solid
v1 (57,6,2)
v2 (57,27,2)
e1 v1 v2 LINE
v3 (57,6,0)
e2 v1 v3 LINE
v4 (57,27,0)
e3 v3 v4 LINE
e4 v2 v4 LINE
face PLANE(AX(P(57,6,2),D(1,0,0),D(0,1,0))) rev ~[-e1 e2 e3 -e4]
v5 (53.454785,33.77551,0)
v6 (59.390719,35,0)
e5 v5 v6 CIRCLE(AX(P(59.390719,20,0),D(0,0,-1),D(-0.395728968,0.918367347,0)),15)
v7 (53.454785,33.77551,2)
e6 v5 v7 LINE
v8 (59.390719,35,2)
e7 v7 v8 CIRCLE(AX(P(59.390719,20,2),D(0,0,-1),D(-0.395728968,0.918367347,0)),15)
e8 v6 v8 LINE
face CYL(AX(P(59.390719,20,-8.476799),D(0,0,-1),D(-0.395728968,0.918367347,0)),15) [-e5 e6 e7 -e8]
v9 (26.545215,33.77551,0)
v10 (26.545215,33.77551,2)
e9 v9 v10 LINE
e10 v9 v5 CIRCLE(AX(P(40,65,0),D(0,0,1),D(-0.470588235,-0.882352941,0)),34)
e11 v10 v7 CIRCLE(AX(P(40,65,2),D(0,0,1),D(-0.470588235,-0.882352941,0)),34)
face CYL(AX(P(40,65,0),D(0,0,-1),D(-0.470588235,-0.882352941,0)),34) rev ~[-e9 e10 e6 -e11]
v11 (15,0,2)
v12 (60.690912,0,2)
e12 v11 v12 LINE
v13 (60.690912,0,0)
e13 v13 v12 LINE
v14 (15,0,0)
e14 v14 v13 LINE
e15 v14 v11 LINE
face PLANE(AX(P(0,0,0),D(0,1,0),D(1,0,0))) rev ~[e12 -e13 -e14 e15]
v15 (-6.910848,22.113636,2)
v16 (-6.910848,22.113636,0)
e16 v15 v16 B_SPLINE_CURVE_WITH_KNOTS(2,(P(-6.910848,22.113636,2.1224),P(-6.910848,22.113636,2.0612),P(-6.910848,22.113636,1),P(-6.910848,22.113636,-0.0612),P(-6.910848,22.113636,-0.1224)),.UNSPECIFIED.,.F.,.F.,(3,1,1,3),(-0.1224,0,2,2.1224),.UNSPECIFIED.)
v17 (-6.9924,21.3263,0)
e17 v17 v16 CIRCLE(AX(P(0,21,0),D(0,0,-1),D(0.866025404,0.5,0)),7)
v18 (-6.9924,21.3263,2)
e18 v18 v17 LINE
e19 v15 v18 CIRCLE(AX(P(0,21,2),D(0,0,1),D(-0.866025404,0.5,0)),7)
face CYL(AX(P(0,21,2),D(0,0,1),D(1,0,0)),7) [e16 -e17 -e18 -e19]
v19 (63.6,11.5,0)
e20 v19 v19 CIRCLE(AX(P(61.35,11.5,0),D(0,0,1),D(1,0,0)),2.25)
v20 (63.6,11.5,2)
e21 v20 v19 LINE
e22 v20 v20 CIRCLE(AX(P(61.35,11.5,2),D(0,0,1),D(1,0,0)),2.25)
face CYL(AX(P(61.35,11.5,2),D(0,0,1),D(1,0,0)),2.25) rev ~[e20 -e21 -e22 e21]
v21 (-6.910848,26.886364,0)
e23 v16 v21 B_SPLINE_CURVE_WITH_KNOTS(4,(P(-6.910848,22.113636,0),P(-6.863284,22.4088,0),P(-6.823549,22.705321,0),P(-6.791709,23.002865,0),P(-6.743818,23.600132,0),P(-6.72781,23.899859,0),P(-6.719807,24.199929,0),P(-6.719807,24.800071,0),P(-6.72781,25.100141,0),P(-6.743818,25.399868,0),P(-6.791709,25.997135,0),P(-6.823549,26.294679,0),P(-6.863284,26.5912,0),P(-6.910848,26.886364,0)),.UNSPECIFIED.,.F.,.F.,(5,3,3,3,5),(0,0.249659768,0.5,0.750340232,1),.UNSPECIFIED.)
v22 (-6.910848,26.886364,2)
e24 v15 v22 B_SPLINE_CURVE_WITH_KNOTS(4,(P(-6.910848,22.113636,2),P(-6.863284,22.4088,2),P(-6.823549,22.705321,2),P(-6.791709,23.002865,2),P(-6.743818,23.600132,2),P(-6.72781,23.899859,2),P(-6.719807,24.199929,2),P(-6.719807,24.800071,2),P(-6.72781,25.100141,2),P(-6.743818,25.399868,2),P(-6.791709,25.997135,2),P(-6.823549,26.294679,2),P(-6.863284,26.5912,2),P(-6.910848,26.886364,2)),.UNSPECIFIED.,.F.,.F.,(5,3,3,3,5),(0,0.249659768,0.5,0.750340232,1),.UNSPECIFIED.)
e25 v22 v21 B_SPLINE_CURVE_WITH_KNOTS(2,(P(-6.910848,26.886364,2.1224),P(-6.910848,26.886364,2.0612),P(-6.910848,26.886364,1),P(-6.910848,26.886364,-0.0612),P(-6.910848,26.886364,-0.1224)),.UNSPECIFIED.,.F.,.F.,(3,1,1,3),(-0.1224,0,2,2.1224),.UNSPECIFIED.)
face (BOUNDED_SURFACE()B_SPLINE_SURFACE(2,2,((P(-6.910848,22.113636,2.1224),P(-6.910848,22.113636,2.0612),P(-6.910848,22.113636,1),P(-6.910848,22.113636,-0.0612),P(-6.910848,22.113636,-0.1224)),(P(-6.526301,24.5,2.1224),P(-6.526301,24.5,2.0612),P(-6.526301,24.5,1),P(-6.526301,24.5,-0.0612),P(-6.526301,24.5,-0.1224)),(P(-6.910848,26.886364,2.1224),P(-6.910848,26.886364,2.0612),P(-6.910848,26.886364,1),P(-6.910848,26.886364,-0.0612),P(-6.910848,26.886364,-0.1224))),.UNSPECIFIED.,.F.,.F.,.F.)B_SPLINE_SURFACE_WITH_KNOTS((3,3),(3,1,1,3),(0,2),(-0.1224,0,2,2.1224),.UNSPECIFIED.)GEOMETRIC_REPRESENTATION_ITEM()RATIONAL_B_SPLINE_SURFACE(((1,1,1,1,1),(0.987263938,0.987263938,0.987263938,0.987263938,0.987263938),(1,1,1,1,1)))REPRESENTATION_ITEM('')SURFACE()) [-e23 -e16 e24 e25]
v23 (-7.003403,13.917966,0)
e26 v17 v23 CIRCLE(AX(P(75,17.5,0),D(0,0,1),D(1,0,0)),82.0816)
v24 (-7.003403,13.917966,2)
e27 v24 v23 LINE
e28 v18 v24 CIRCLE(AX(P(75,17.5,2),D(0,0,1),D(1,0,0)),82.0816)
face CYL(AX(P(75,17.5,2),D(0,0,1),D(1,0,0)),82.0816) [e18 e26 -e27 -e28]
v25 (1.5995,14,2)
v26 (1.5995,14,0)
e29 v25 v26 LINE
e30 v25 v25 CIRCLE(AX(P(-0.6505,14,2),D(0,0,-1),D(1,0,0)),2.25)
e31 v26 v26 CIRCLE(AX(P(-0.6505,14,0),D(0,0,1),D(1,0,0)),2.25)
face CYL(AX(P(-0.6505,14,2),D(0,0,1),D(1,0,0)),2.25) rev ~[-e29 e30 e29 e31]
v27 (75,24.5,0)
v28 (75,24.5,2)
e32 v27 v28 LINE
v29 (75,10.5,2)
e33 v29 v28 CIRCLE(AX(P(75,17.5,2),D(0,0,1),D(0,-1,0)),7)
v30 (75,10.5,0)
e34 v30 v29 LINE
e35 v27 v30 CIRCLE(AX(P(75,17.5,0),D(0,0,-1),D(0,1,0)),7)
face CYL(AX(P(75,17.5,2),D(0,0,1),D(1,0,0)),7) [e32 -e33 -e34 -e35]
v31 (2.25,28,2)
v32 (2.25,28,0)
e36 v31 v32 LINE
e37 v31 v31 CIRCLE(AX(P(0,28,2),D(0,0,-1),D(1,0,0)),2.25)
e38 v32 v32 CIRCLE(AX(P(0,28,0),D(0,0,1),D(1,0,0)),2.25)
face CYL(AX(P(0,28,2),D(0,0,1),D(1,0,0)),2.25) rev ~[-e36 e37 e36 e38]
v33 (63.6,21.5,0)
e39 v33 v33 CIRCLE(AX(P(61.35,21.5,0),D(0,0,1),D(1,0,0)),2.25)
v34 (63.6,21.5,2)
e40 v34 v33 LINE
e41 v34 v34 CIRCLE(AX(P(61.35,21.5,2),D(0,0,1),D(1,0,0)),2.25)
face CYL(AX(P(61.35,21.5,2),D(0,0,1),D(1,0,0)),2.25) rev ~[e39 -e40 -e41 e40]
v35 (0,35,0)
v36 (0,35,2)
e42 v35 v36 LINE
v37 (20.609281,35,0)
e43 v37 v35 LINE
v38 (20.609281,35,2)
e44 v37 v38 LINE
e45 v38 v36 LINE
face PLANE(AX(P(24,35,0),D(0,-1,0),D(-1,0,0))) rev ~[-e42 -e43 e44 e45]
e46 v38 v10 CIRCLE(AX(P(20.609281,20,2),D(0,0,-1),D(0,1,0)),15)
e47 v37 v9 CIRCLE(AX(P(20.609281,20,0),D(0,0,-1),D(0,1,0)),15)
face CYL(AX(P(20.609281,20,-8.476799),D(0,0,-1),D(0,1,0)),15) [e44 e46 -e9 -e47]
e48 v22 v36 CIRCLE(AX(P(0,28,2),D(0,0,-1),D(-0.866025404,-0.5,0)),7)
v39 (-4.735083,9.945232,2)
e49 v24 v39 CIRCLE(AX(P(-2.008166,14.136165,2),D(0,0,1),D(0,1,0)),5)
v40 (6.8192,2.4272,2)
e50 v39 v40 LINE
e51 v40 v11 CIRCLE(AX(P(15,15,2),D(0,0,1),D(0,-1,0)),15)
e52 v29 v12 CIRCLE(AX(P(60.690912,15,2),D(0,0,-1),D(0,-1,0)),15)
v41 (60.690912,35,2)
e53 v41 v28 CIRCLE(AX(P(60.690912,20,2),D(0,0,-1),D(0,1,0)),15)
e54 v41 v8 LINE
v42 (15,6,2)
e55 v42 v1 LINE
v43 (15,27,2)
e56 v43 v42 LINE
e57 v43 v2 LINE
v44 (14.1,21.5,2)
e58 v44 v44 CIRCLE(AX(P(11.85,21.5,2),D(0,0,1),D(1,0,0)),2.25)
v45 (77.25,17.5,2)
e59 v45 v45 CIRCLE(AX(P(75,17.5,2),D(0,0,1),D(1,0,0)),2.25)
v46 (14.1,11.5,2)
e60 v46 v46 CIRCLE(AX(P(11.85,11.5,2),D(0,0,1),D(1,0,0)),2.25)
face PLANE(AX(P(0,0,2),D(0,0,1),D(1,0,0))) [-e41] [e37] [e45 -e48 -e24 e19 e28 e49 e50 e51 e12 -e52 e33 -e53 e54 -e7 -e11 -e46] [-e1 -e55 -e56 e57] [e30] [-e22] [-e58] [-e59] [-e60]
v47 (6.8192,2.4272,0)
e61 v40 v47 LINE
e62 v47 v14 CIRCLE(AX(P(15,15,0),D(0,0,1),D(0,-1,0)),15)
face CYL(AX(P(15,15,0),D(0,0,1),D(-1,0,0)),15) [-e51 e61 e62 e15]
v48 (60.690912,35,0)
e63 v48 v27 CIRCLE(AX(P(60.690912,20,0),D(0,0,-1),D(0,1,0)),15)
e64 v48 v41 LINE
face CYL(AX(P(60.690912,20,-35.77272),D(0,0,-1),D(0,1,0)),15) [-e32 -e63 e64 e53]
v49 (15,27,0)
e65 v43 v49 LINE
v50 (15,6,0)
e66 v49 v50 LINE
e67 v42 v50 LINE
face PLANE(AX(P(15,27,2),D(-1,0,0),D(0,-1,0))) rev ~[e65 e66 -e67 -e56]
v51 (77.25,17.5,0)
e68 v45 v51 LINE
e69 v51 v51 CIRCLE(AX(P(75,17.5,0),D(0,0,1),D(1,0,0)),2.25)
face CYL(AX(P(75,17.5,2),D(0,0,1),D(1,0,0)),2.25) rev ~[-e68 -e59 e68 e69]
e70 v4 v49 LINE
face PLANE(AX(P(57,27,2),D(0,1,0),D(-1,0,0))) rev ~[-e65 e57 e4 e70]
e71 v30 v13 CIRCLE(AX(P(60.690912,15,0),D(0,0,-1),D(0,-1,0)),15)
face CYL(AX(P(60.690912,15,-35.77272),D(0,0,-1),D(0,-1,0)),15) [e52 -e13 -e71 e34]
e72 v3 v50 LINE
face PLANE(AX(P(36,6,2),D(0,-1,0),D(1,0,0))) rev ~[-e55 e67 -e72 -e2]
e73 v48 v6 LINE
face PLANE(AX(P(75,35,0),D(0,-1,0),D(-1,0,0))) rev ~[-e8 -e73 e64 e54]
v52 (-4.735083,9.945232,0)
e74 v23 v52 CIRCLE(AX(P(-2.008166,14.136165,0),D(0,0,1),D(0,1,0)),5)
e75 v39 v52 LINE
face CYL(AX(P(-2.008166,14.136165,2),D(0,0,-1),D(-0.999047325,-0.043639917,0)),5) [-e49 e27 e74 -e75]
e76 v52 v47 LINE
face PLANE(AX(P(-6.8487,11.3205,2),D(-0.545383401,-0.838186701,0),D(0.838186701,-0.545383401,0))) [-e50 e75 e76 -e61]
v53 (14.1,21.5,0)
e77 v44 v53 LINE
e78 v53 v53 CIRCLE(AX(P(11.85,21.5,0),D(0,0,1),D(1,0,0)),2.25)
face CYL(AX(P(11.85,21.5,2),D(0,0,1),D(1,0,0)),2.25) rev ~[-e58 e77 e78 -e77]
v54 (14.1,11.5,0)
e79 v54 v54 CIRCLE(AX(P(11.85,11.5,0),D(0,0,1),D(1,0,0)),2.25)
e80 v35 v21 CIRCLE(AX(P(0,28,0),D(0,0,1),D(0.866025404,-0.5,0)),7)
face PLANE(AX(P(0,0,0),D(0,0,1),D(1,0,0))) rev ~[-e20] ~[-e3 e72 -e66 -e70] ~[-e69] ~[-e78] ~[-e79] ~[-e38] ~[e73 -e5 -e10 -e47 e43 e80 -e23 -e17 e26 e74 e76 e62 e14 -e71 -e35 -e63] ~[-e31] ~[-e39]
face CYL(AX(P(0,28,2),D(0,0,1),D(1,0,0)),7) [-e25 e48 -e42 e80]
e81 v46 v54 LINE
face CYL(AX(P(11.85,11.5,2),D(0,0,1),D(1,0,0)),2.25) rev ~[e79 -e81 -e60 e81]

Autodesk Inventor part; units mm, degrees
ref_plane "YZ Plane" through (0, 0, 0) normal (1, 0, 0) x (0, 1, 0)
ref_plane "XZ Plane" through (0, 0, 0) normal (0, 1, 0) x (-1, 0, 0)
ref_plane "XY Plane" through (0, 0, 0) normal (0, 0, 1) x (1, 0, 0)
sketch "Skizze1" plane through (0, 0, 0) normal (0, 0, 1) x (1, 0, 0)
  line L0 (0, 78) -> (0, -13) projected
  line L1 (-15, 0) -> (90, 0) projected
  line L2 (0, 0) -> (75, 0)
  line L3 (75, 0) -> (75, 35)
  line L4 (75, 35) -> (0, 35)
  line L5 (0, 35) -> (0, 0)
  arc A0 (24, 35) -> (56, 35) centre (40, 65) ccw
  dimension "d0" = 75
  dimension "d1" = 35
  dimension "d3" = 35
  dimension "d4" = 30
  dimension "d6" = 34
extrude "Extrusion1" add sketch "Skizze1" along normal blind 2 contours L4 A0 L3 L1 L0
sketch "Skizze2" plane through (0, 0, 2) normal (0, 0, 1) x (1, 0, 0)
  line L0 (36, 6) -> (57, 6)
  line L1 (57, 6) -> (57, 27)
  line L2 (57, 27) -> (36, 27)
  line L3 (36, 27) -> (36, 6)
  line L4 (36, 6) -> (57, 27) construction
  line L5 (57, 6) -> (36, 27) construction
  line L6 (57, 27) -> (15, 27)
  line L7 (15, 27) -> (15, 6)
  line L8 (15, 6) -> (57, 6)
  line L9 (57, 6) -> (57, 27)
  line L10 (75, 0) -> (75, 35) projected
  line L11 (24, 35) -> (0, 35) projected
  circle A0 centre (61.35, 21.5) radius 2.25
  circle A1 centre (61.35, 11.5) radius 2.25
  circle A2 centre (11.85, 11.5) radius 2.25
  circle A3 centre (11.85, 21.5) radius 2.25
  point P0 (0, 0)
  point P1 (46.5, 16.5)
  dimension "d9" = 21
  dimension "d10" = 21
  dimension "d11" = 42
  dimension "d12" = 0
  dimension "d13" = 18
  dimension "d14" = 8
  dimension "d15" = 4.5
  dimension "d16" = 4.5
  dimension "d17" = 4.5
  dimension "d18" = 4.5
  dimension "d19" = 14.85
  dimension "d20" = 5
  dimension "d21" = 5
  dimension "d22" = 14.85
  dimension "d23" = 34.65
  dimension "d24" = 34.65
  dimension "d27" = 5
  dimension "d28" = 5
extrude "Extrusion2" cut sketch "Skizze2" against normal blind 2
sketch "Skizze3" plane through (0, 0, 2) normal (0, 0, 1) x (1, 0, 0)
  circle A0 centre (11.85, 21.5) radius 2.25 projected
  circle A1 centre (61.35, 11.5) radius 2.25 projected
  circle A2 centre (61.35, 21.5) radius 2.25 projected
  circle A3 centre (11.85, 11.5) radius 2.25 projected
  line L0 (15, 27) -> (15, 6) projected
  line L1 (15, 6) -> (57, 6) projected
  line L2 (57, 6) -> (57, 27) projected
  line L3 (57, 27) -> (15, 27) projected
  line L4 (0, 0) -> (0, 35) projected
  line L5 (0, 35) -> (24, 35) projected
  arc A4 (24, 35) -> (56, 35) centre (40, 65) ccw projected
  line L6 (56, 35) -> (75, 35) projected
  line L7 (75, 35) -> (75, 0) projected
  line L8 (75, 0) -> (0, 0) projected
  line L9 (75, 0) -> (75, 35) projected
  circle A5 centre (75, 17.5) radius 7
  line L10 (75, 0) -> (75, 35) projected
  dimension "d31" = 14
  dimension "d32" = 35
  dimension "d33" = 17.5
extrude "Extrusion3" add sketch "Skizze3" against normal blind 2 contours A5 L7 | L7 A5
sketch "Skizze4" plane through (0, 0, 2) normal (0, 0, 1) x (1, 0, 0)
  circle A0 centre (11.85, 21.5) radius 2.25 projected
  circle A1 centre (61.35, 11.5) radius 2.25 projected
  circle A2 centre (61.35, 21.5) radius 2.25 projected
  circle A3 centre (11.85, 11.5) radius 2.25 projected
  line L0 (15, 27) -> (15, 6) projected
  line L1 (15, 6) -> (57, 6) projected
  line L2 (57, 6) -> (57, 27) projected
  line L3 (57, 27) -> (15, 27) projected
  line L4 (0, 0) -> (0, 35) projected
  line L5 (0, 35) -> (24, 35) projected
  arc A4 (24, 35) -> (56, 35) centre (40, 65) ccw projected
  line L6 (56, 35) -> (75, 35) projected
  line L7 (75, 35) -> (75, 24.5) projected
  arc A5 (75, 10.5) -> (75, 24.5) centre (75, 17.5) ccw projected
  line L8 (75, 10.5) -> (75, 0) projected
  line L9 (75, 0) -> (0, 0) projected
  circle A6 centre (75, 17.5) radius 2.25
  dimension "d36" = 4.5
extrude "Extrusion4" cut sketch "Skizze4" against normal blind 2 contours A6
fillet "Rundung1" radius 15 1 edges at (0, 0, 1)
sketch "Skizze5" plane through (0, 0, 2) normal (0, 0, 1) x (1, 0, 0)
  line L0 (0, 35) -> (0, 15) projected
  circle A0 centre (0, 28) radius 7
  circle A1 centre (75, 17.5) radius 2.25 projected
  arc A2 (75, 10.5) -> (75, 24.5) centre (75, 17.5) ccw projected
  line L1 (75, 10.5) -> (75, 0) projected
  line L2 (75, 0) -> (15, 0) projected
  arc A3 (0, 15) -> (15, 0) centre (15, 15) ccw projected
  line L3 (0, 15) -> (0, 35) projected
  line L4 (0, 35) -> (24, 35) projected
  arc A4 (24, 35) -> (56, 35) centre (40, 65) ccw projected
  line L5 (56, 35) -> (75, 35) projected
  line L6 (75, 35) -> (75, 24.5) projected
  circle A5 centre (11.85, 21.5) radius 2.25 projected
  circle A6 centre (61.35, 11.5) radius 2.25 projected
  circle A7 centre (61.35, 21.5) radius 2.25 projected
  circle A8 centre (11.85, 11.5) radius 2.25 projected
  line L7 (15, 27) -> (15, 6) projected
  line L8 (15, 6) -> (57, 6) projected
  line L9 (57, 6) -> (57, 27) projected
  line L10 (57, 27) -> (15, 27) projected
  circle A9 centre (0, 21) radius 7
  point P0 (0, 0)
  dimension "d40" = 14
  dimension "d46" = 14
extrude "Extrusion5" add sketch "Skizze5" against normal blind 2 contours A0 A9 L0 | L0 A9 A0 | A9 A0 L0 | L0 A0 A9 | A0 L0 A3 A9 | A0 A9 A3 L0
sketch "Skizze6" plane through (0, 0, 2) normal (0, 0, 1) x (1, 0, 0)
  circle A0 centre (75, 17.5) radius 2.25 projected
  arc A1 (75, 10.5) -> (75, 24.5) centre (75, 17.5) ccw projected
  line L0 (75, 10.5) -> (75, 0) projected
  line L1 (75, 0) -> (15, 0) projected
  line L2 (0, 35) -> (24, 35) projected
  arc A2 (24, 35) -> (56, 35) centre (40, 65) ccw projected
  line L3 (56, 35) -> (75, 35) projected
  line L4 (75, 35) -> (75, 24.5) projected
  circle A3 centre (11.85, 21.5) radius 2.25 projected
  circle A4 centre (61.35, 11.5) radius 2.25 projected
  circle A5 centre (61.35, 21.5) radius 2.25 projected
  circle A6 centre (11.85, 11.5) radius 2.25 projected
  line L5 (15, 27) -> (15, 6) projected
  line L6 (15, 6) -> (57, 6) projected
  line L7 (57, 6) -> (57, 27) projected
  line L8 (57, 27) -> (15, 27) projected
  circle A7 centre (0, 28) radius 2.25
  circle A8 centre (75, 17.5) radius 75.7314
  circle A9 centre (-0.7298, 18) radius 7
  arc A10 (0.0334, 14.0001) -> (15, 0) centre (15, 15) ccw projected
  arc A11 (-6.0622, 24.5) -> (0.0334, 14.0001) centre (0, 21) ccw projected
  arc A12 (0, 35) -> (-6.0622, 24.5) centre (0, 28) ccw projected
  point P0 (0, 0)
  point P1 (0, 21)
  dimension "d43" = 4.5
  dimension "d47" = 14
  dimension "d48" = 3
extrude "Extrusion6" cut sketch "Skizze6" against normal blind 2 contours A8 A7 | A7 A8
fillet "Rundung2" radius 15 2 edges at (-6.0622, 24.5, 1) (0.0334, 14.0001, 1)
sketch "Skizze7" plane through (0, 0, 2) normal (0, 0, 1) x (1, 0, 0)
  circle A0 centre (0, 28) radius 2.25 projected
  circle A1 centre (75, 17.5) radius 2.25 projected
  arc A2 (75, 10.5) -> (75, 24.5) centre (75, 17.5) ccw projected
  line L0 (75, 10.5) -> (75, 0) projected
  line L1 (75, 0) -> (15, 0) projected
  arc A3 (1.286, 8.9233) -> (15, 0) centre (15, 15) ccw projected
  arc A4 (1.286, 8.9233) -> (-3.9544, 15.2239) centre (-12.428, 2.8466) ccw projected
  arc A5 (-6.9108, 22.1136) -> (-3.9544, 15.2239) centre (0, 21) ccw projected
  arc A6 (-6.9108, 22.1136) -> (-6.9108, 26.8864) centre (-21.7198, 24.5) ccw projected
  arc A7 (0, 35) -> (-6.9108, 26.8864) centre (0, 28) ccw projected
  line L2 (0, 35) -> (24, 35) projected
  arc A8 (24, 35) -> (56, 35) centre (40, 65) ccw projected
  line L3 (56, 35) -> (75, 35) projected
  line L4 (75, 35) -> (75, 24.5) projected
  circle A9 centre (11.85, 21.5) radius 2.25 projected
  circle A10 centre (61.35, 11.5) radius 2.25 projected
  circle A11 centre (61.35, 21.5) radius 2.25 projected
  circle A12 centre (11.85, 11.5) radius 2.25 projected
  line L5 (15, 27) -> (15, 6) projected
  line L6 (15, 6) -> (57, 6) projected
  line L7 (57, 6) -> (57, 27) projected
  line L8 (57, 27) -> (15, 27) projected
  arc A13 (75, 10.5) -> (75, 24.5) centre (75, 17.5) ccw projected
  circle A14 centre (75, 17.5) radius 75.7314
  circle A15 centre (-0.7166, 19) radius 2.25
  point P0 (0, 0)
  dimension "d50" = 9
  dimension "d51" = 4.5
extrude "Extrusion7" cut sketch "Skizze7" against normal blind 2 contours A15 A14 | A14 A15
fillet "Rundung3" radius 15 4 edges at (75, 35, 1) (56, 35, 1) (24, 35, 1) (75, 0, 1)
sketch "Skizze8" plane through (0, 0, 2) normal (0, 0, 1) x (1, 0, 0)
  circle A0 centre (-0.7166, 19) radius 2.25 projected
  arc A1 (1.286, 8.9233) -> (-3.9544, 15.2239) centre (-12.428, 2.8466) ccw projected
  arc A2 (-6.9108, 22.1136) -> (-3.9544, 15.2239) centre (0, 21) ccw projected
  arc A3 (-6.9108, 22.1136) -> (-6.9108, 26.8864) centre (-21.7198, 24.5) ccw projected
  arc A4 (0, 35) -> (-6.9108, 26.8864) centre (0, 28) ccw projected
  line L0 (0, 35) -> (20.6093, 35) projected
  arc A5 (26.5452, 33.7755) -> (20.6093, 35) centre (20.6093, 20) ccw projected
  arc A6 (26.5452, 33.7755) -> (53.4548, 33.7755) centre (40, 65) ccw projected
  arc A7 (59.3907, 35) -> (53.4548, 33.7755) centre (59.3907, 20) ccw projected
  line L1 (59.3907, 35) -> (60.6909, 35) projected
  arc A8 (75, 24.5) -> (60.6909, 35) centre (60.6909, 20) ccw projected
  arc A9 (75, 10.5) -> (75, 24.5) centre (75, 17.5) ccw projected
  arc A10 (60.6909, 0) -> (75, 10.5) centre (60.6909, 15) ccw projected
  line L2 (60.6909, 0) -> (15, 0) projected
  arc A11 (1.286, 8.9233) -> (15, 0) centre (15, 15) ccw projected
  circle A12 centre (0, 28) radius 2.25 projected
  circle A13 centre (75, 17.5) radius 2.25 projected
  circle A14 centre (11.85, 21.5) radius 2.25 projected
  circle A15 centre (61.35, 11.5) radius 2.25 projected
  circle A16 centre (61.35, 21.5) radius 2.25 projected
  circle A17 centre (11.85, 11.5) radius 2.25 projected
  line L3 (15, 27) -> (15, 6) projected
  line L4 (15, 6) -> (57, 6) projected
  line L5 (57, 6) -> (57, 27) projected
  line L6 (57, 27) -> (15, 27) projected
  circle A18 centre (75, 17.5) radius 2.25 projected
  circle A19 centre (75, 17.5) radius 82.0816
  line L7 (-6.8487, 11.3205) -> (6.8192, 2.4272)
  arc A20 (1.286, 8.9233) -> (15, 0) centre (15, 15) ccw projected
  line L8 (6.8192, 2.4272) -> (-0.8956, 15)
  line L9 (-0.8956, 15) -> (-5.8598, 18.2396)
  line L10 (-5.8598, 18.2396) -> (-6.9924, 21.3263)
  arc A21 (-6.9108, 22.1136) -> (-3.9544, 15.2239) centre (0, 21) ccw projected
  point P0 (0, 0)
extrude "Extrusion8" add sketch "Skizze8" against normal blind 2 contours A11 L7 A19 A2 A1 | A1 A2 L10 L9 L8 A11
fillet "Rundung4" radius 5 1 edges at (-6.8487, 11.3205, 1)
sketch "Skizze9" plane through (0, 0, 2) normal (0, 0, 1) x (1, 0, 0)
  arc A0 (26.5452, 33.7755) -> (20.6093, 35) centre (20.6093, 20) ccw projected
  arc A1 (26.5452, 33.7755) -> (53.4548, 33.7755) centre (40, 65) ccw projected
  arc A2 (59.3907, 35) -> (53.4548, 33.7755) centre (59.3907, 20) ccw projected
  line L0 (59.3907, 35) -> (60.6909, 35) projected
  arc A3 (75, 24.5) -> (60.6909, 35) centre (60.6909, 20) ccw projected
  arc A4 (75, 10.5) -> (75, 24.5) centre (75, 17.5) ccw projected
  arc A5 (60.6909, 0) -> (75, 10.5) centre (60.6909, 15) ccw projected
  line L1 (60.6909, 0) -> (15, 0) projected
  arc A6 (6.8192, 2.4272) -> (15, 0) centre (15, 15) ccw projected
  line L2 (6.8192, 2.4272) -> (-4.7351, 9.9453) projected
  arc A7 (-7.0034, 13.918) -> (-4.7351, 9.9453) centre (-2.0082, 14.1362) ccw projected
  arc A8 (-6.9924, 21.3263) -> (-7.0034, 13.918) centre (75, 17.5) ccw projected
  arc A9 (-6.9108, 22.1136) -> (-6.9924, 21.3263) centre (0, 21) ccw projected
  arc A10 (-6.9108, 22.1136) -> (-6.9108, 26.8864) centre (-21.7198, 24.5) ccw projected
  arc A11 (0, 35) -> (-6.9108, 26.8864) centre (0, 28) ccw projected
  line L3 (0, 35) -> (20.6093, 35) projected
  circle A12 centre (-0.7166, 19) radius 2.25 projected
  circle A13 centre (0, 28) radius 2.25 projected
  circle A14 centre (75, 17.5) radius 2.25 projected
  circle A15 centre (11.85, 21.5) radius 2.25 projected
  circle A16 centre (61.35, 11.5) radius 2.25 projected
  circle A17 centre (61.35, 21.5) radius 2.25 projected
  circle A18 centre (11.85, 11.5) radius 2.25 projected
  line L4 (15, 27) -> (15, 6) projected
  line L5 (15, 6) -> (57, 6) projected
  line L6 (57, 6) -> (57, 27) projected
  line L7 (57, 27) -> (15, 27) projected
  point P0 (0, 0)
extrude "Extrusion9" add sketch "Skizze9" against normal up to surface (2 mm away) contours A12
sketch "Skizze10" plane through (0, 0, 2) normal (0, 0, 1) x (1, 0, 0)
  arc A0 (26.5452, 33.7755) -> (20.6093, 35) centre (20.6093, 20) ccw projected
  arc A1 (26.5452, 33.7755) -> (53.4548, 33.7755) centre (40, 65) ccw projected
  arc A2 (59.3907, 35) -> (53.4548, 33.7755) centre (59.3907, 20) ccw projected
  line L0 (59.3907, 35) -> (60.6909, 35) projected
  arc A3 (75, 24.5) -> (60.6909, 35) centre (60.6909, 20) ccw projected
  arc A4 (75, 10.5) -> (75, 24.5) centre (75, 17.5) ccw projected
  arc A5 (60.6909, 0) -> (75, 10.5) centre (60.6909, 15) ccw projected
  line L1 (60.6909, 0) -> (15, 0) projected
  arc A6 (6.8192, 2.4272) -> (15, 0) centre (15, 15) ccw projected
  line L2 (6.8192, 2.4272) -> (-4.7351, 9.9453) projected
  arc A7 (-7.0034, 13.918) -> (-4.7351, 9.9453) centre (-2.0082, 14.1362) ccw projected
  arc A8 (-6.9924, 21.3263) -> (-7.0034, 13.918) centre (75, 17.5) ccw projected
  arc A9 (-6.9108, 22.1136) -> (-6.9924, 21.3263) centre (0, 21) ccw projected
  arc A10 (-6.9108, 22.1136) -> (-6.9108, 26.8864) centre (-21.7198, 24.5) ccw projected
  arc A11 (0, 35) -> (-6.9108, 26.8864) centre (0, 28) ccw projected
  line L3 (0, 35) -> (20.6093, 35) projected
  circle A12 centre (0, 28) radius 2.25 projected
  circle A13 centre (75, 17.5) radius 2.25 projected
  circle A14 centre (11.85, 21.5) radius 2.25 projected
  circle A15 centre (61.35, 11.5) radius 2.25 projected
  circle A16 centre (61.35, 21.5) radius 2.25 projected
  circle A17 centre (11.85, 11.5) radius 2.25 projected
  line L4 (15, 27) -> (15, 6) projected
  line L5 (15, 6) -> (57, 6) projected
  line L6 (57, 6) -> (57, 27) projected
  line L7 (57, 27) -> (15, 27) projected
  circle A18 centre (75, 17.5) radius 75.7314
  circle A19 centre (-0.6505, 14) radius 2.25
  point P0 (0, 0)
  dimension "d60" = 14
  dimension "d61" = 4.5
extrude "Extrusion10" cut sketch "Skizze10" against normal blind 2 contours A19 A18 | A18 A19
equation "\"d16\" = d15"
equation "\"d17\" = d15"
equation "\"d18\" = d17"
equation "\"d21\" = d20"
equation "\"d22\" = d19"
equation "\"d24\" = d23"
equation "\"d28\" = d27"
equation "\"d33\" = 0.5 * d32"
properties part number "Adapter"
